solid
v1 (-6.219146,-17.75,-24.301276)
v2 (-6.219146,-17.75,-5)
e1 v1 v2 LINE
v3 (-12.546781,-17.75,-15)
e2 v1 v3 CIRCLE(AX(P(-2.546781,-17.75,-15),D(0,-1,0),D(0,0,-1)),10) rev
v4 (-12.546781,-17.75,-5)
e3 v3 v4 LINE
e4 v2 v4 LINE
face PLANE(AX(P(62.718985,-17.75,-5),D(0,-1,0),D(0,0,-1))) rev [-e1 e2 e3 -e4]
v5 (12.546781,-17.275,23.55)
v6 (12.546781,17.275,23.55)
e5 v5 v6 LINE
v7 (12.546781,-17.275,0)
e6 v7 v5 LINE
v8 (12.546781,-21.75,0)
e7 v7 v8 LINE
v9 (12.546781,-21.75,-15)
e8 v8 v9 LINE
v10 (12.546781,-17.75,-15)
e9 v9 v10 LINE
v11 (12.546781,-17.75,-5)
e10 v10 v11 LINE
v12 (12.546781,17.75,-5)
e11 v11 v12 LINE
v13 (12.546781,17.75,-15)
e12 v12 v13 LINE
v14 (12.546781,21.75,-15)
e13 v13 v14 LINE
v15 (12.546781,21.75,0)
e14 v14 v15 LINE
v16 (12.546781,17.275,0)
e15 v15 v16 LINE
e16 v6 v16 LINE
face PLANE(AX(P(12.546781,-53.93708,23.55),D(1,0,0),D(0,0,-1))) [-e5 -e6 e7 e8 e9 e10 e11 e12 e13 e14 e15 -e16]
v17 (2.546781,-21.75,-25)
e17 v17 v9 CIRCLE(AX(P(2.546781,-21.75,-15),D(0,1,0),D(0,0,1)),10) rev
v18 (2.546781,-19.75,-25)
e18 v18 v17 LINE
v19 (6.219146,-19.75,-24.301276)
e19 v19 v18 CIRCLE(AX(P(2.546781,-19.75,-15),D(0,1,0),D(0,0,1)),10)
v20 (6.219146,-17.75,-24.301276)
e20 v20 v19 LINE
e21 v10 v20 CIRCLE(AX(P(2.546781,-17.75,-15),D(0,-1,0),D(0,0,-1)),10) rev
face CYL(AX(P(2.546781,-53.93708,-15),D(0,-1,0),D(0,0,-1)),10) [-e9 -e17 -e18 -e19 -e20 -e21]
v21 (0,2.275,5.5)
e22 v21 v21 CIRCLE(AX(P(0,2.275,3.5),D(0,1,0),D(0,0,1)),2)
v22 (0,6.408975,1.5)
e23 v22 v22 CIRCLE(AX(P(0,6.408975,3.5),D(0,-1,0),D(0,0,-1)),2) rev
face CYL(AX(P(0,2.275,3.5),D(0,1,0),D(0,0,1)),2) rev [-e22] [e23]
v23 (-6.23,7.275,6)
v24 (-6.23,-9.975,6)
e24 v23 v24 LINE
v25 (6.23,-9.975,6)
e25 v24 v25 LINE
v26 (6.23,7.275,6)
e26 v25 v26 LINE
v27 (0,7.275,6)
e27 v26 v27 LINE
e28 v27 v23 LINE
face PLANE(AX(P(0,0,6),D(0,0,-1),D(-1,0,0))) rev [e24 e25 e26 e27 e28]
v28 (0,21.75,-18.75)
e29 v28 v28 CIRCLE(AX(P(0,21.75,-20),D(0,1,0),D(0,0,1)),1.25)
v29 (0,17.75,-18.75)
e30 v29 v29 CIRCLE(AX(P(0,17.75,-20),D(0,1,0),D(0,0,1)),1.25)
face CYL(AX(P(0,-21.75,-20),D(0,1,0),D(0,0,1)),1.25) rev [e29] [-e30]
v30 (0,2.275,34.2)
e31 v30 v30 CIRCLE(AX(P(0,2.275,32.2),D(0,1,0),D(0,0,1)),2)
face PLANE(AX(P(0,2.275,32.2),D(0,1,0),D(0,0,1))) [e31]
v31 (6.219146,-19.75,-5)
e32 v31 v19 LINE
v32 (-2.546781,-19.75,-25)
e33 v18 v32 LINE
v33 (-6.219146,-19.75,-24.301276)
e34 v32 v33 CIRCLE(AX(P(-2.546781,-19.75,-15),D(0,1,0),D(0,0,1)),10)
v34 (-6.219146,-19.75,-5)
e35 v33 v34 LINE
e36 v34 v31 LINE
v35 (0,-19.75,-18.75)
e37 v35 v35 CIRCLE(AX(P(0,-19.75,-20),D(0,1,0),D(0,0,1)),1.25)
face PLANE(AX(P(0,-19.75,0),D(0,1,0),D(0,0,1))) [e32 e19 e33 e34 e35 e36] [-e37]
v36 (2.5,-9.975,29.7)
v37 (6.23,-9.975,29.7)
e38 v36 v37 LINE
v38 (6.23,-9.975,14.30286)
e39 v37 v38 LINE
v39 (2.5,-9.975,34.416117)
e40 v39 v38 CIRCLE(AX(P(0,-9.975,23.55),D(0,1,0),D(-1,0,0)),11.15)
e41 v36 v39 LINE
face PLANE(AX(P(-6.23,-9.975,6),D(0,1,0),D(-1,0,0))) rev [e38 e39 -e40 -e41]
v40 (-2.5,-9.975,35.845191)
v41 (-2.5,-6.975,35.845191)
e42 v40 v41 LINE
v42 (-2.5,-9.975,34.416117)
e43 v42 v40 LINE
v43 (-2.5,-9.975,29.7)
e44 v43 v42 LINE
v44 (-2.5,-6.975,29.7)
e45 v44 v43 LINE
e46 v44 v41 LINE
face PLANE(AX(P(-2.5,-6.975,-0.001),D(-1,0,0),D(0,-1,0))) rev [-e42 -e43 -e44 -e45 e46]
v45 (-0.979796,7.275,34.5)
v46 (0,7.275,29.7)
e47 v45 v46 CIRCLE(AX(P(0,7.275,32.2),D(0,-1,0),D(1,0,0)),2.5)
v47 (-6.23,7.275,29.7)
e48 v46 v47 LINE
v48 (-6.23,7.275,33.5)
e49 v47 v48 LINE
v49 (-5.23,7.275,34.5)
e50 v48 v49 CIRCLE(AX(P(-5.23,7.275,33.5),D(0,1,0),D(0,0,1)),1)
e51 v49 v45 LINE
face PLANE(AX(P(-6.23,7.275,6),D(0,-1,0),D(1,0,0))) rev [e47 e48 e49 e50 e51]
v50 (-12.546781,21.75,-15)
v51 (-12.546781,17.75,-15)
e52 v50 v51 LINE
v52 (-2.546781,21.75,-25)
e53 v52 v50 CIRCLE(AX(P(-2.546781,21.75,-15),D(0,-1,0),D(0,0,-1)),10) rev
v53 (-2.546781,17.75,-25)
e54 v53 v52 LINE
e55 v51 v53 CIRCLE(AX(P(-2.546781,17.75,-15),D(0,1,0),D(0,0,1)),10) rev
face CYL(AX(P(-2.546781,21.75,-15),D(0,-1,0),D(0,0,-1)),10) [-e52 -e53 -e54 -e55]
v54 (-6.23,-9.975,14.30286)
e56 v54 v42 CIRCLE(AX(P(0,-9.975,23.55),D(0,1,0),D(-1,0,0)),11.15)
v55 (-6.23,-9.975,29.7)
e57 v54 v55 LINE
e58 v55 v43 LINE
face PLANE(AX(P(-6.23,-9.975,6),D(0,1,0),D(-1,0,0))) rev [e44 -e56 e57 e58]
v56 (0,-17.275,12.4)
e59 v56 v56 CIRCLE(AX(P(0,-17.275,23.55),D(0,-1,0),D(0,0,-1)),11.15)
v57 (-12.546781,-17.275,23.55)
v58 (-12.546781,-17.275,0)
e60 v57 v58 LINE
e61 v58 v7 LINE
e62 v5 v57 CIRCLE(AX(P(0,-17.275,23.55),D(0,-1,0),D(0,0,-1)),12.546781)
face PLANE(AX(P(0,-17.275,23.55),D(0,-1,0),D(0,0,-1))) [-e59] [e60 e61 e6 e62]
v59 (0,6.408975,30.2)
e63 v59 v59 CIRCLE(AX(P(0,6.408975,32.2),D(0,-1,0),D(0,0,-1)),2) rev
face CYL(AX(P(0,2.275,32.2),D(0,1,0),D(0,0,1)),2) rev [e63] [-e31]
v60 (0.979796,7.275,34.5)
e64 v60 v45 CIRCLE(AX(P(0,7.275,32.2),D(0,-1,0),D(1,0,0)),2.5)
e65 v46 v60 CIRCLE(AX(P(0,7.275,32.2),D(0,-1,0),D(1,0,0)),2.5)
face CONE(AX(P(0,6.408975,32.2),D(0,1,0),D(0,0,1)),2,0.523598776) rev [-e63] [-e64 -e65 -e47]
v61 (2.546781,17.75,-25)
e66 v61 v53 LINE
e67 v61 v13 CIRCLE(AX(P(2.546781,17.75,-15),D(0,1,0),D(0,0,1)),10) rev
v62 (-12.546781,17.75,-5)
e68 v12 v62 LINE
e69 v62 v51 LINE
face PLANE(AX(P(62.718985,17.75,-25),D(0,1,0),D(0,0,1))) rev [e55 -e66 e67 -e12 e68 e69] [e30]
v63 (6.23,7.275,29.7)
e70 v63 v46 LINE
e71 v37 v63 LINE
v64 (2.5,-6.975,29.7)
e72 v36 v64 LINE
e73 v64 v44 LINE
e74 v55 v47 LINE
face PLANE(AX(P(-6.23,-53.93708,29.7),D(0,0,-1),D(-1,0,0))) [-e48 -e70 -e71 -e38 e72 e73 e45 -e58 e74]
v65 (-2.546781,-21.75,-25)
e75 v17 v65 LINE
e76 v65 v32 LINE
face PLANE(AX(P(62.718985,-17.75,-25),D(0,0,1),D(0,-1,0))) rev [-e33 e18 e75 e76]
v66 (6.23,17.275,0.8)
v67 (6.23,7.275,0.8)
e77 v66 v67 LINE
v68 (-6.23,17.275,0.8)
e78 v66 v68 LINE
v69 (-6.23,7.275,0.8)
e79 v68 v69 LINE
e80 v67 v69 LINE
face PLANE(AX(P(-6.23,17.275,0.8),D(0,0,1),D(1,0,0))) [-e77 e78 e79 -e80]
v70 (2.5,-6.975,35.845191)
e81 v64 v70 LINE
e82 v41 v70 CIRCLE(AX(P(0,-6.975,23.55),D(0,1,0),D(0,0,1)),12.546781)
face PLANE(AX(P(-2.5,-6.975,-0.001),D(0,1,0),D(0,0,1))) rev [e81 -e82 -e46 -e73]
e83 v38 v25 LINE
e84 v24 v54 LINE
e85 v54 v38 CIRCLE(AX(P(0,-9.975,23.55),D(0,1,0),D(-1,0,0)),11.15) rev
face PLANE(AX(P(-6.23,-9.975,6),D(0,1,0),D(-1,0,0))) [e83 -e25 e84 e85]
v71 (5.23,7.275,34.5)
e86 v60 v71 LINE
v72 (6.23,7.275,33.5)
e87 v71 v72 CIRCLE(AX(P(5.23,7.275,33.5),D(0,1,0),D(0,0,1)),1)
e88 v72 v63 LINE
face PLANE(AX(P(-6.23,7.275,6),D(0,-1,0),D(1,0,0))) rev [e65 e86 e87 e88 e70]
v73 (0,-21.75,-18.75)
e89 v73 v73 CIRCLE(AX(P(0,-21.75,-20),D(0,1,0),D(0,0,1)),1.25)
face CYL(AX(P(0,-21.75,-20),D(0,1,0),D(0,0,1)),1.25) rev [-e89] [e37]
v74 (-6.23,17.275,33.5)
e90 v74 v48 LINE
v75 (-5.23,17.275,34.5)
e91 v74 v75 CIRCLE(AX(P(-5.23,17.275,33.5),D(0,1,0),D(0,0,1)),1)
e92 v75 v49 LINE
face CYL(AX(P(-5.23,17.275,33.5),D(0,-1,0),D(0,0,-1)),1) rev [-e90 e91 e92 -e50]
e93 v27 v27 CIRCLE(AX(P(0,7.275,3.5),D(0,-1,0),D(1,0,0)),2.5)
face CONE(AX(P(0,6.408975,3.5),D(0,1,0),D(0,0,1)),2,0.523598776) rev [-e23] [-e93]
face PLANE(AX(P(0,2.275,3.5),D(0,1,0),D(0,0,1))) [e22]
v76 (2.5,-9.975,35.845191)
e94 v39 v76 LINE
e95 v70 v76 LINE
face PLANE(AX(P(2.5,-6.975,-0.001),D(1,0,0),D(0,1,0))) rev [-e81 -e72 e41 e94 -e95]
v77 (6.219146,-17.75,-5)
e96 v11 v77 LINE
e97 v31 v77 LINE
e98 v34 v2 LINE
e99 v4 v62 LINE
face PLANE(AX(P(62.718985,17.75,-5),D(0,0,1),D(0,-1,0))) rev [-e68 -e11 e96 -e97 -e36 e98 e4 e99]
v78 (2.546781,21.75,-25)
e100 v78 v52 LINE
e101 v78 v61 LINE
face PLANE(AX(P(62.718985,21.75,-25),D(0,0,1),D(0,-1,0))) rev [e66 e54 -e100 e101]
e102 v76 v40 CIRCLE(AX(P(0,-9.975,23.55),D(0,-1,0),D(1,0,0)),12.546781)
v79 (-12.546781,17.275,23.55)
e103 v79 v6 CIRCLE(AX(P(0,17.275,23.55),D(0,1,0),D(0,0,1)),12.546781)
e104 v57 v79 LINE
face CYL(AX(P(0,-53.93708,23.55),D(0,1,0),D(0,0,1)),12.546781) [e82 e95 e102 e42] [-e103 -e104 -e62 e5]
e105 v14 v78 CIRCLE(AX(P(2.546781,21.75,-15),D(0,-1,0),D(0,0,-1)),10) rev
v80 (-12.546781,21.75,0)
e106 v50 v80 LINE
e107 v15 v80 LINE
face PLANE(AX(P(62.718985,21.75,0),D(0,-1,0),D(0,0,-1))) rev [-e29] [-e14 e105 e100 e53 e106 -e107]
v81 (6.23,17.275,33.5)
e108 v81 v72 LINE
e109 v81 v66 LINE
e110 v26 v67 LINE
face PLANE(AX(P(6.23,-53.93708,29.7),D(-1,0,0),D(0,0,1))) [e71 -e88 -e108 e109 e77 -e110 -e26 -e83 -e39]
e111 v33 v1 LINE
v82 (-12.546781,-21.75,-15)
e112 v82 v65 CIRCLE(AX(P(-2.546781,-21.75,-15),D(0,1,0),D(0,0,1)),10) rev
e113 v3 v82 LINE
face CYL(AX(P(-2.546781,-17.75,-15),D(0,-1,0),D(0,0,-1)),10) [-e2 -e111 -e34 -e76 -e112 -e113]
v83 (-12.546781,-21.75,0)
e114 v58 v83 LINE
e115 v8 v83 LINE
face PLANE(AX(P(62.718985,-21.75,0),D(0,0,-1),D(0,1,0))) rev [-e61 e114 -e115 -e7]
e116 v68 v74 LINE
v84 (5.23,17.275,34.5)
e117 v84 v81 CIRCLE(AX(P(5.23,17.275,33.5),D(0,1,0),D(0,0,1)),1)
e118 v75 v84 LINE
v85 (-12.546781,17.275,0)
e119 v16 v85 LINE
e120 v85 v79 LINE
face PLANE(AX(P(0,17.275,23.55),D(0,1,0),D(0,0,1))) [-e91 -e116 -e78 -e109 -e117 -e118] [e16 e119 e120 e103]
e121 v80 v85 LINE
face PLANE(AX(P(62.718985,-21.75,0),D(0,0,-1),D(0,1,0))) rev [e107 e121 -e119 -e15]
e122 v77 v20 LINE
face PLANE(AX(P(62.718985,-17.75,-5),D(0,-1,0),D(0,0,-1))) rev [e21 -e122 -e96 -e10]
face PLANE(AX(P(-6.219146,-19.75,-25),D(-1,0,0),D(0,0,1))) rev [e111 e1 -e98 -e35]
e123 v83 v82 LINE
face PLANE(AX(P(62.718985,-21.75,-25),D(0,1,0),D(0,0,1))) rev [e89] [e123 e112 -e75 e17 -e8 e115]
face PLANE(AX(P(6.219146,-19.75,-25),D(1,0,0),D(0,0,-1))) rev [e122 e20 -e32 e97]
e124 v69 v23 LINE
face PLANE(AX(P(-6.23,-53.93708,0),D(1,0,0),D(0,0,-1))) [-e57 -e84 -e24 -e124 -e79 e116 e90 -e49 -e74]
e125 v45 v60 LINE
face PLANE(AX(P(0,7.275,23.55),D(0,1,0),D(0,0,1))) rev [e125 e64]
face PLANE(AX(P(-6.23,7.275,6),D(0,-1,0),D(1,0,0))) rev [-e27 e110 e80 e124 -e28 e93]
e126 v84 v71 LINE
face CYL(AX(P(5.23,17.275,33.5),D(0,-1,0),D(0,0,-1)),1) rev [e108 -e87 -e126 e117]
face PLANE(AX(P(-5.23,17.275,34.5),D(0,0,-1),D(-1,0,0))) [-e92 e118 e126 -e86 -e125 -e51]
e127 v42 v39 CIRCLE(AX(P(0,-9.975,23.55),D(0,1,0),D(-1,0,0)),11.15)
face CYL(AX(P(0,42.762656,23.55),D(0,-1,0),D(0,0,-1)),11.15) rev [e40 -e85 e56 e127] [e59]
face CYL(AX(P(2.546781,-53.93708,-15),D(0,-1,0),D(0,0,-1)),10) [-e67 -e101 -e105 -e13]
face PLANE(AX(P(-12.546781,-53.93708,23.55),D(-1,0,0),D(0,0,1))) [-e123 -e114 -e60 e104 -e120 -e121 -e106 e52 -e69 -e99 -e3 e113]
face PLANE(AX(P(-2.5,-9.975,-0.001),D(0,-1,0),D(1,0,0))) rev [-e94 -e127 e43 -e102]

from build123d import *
from OCP.BRepFilletAPI import BRepFilletAPI_MakeChamfer

# Parameters (mm, degrees)
SKETCH4_W                = 12.46
SKETCH4_H                = 17.25
BOSS_EXTRUDE3_DEPTH      = 6
BOSS_EXTRUDE6_DEPTH      = 7.3
BOSS_EXTRUDE6_DEPTH_BACK = 17.25
SKETCH8_R                = 12.546781182
SKETCH8_R_2              = 11.15
BOSS_EXTRUDE4_DEPTH      = 17.25
SKETCH6_R                = 2
CUT_EXTRUDE1_DEPTH       = 5
CHAMFER1_SIZE            = 0.5
CHAMFER1_SIZE_2          = 0.866025404
SKETCH10_W               = 12.46
SKETCH10_H               = 23.7
CUT_EXTRUDE3_DEPTH       = 17.25
CUT_EXTRUDE4_REACH       = 43.938
SKETCH11_W               = 5
SKETCH11_H               = 3
BOSS_EXTRUDE7_START      = -7.3
BOSS_EXTRUDE7_DEPTH      = 7.3
BOSS_EXTRUDE9_START      = 10
BOSS_EXTRUDE9_DEPTH      = 10
BOSS_EXTRUDE10_DEPTH     = 25.093562364
SKETCH18_W               = 20
SKETCH18_H               = 12.438292938
CUT_EXTRUDE5_DEPTH       = 2
CUT_EXTRUDE6_DEPTH       = 57.41497434
CUT_EXTRUDE6_DEPTH_BACK  = 57.41497434
SKETCH19_R               = 1.25
FILLET1_R                = 10


with BuildPart() as part:
    # Sketch4 → Boss-Extrude3 (new body)
    with BuildSketch(Plane.XY):
        with Locations((0, -1.35)):
            Rectangle(SKETCH4_W, SKETCH4_H)
    extrude(amount=BOSS_EXTRUDE3_DEPTH)



with BuildPart() as body_2:
    # Sketch8 → Boss-Extrude6 (new, two sides: drawn at the far end of the back side and taken through both)
    with BuildSketch(Plane(origin=(0, -9.975, 0), x_dir=(-1, 0, 0), z_dir=(0, -1, 0)).offset(-BOSS_EXTRUDE6_DEPTH_BACK)):
        with Locations(Location((0, -23.55, 0), (0, 0, 90))):
            Circle(SKETCH8_R)
        with Locations(Location((0, -23.55, 0), (0, 0, 90))):
            Circle(SKETCH8_R_2, mode=Mode.SUBTRACT)
    extrude(amount=BOSS_EXTRUDE6_DEPTH + BOSS_EXTRUDE6_DEPTH_BACK)


with BuildPart() as part_1:
    add(part.part)

    add(body_2.part)  # Boss-Extrude4 merges body 2
    # Sketch5 → Boss-Extrude4 (add)
    with BuildSketch(Plane(origin=(0, 7.275, 0), x_dir=(1, 0, 0), z_dir=(0, 1, 0))):
        with BuildLine():
            Line((12.546781182, -23.55), (12.546781182, 0))
            Line((12.546781182, 0), (6.23, 0))
            Line((6.23, 0), (6.23, -29.7))
            Line((6.23, -29.7), (-6.23, -29.7))
            Line((-6.23, -29.7), (-6.23, 0))
            Line((-6.23, 0), (-12.546781182, 0))
            Line((-12.546781182, 0), (-12.546781182, -23.55))
            ThreePointArc((-12.546781182, -23.55), (0, -36.096781182), (12.546781182, -23.55))
        make_face()
    extrude(amount=-BOSS_EXTRUDE4_DEPTH)

    # Sketch6 → Cut-Extrude1 (cut)
    with BuildSketch(Plane(origin=(0, 7.275, 0), x_dir=(1, 0, 0), z_dir=(0, 1, 0))):
        with Locations(Location((0, -3.5, 0), (0, 0, 270))):
            Circle(SKETCH6_R)
        with Locations(Location((0, -32.2, 0), (0, 0, 270))):
            Circle(SKETCH6_R)
    extrude(amount=-CUT_EXTRUDE1_DEPTH, mode=Mode.SUBTRACT)

    # Chamfer1
    chamfer1_edges_1 = [part_1.edges().sort_by_distance(p)[0] for p in [
        (0, 7.275, 1.5),
    ]]
    chamfer1_side_1 = [part_1.faces().sort_by_distance(p)[0] for p in [
        (0, 7.275, 1.49),
    ]]
    chamfer1_edges_2 = [part_1.edges().sort_by_distance(p)[0] for p in [
        (0, 7.275, 30.2),
    ]]
    chamfer1_side_2 = [part_1.faces().sort_by_distance(p)[0] for p in [
        (0, 7.275, 30.19),
    ]]
    chamfer1 = BRepFilletAPI_MakeChamfer(part_1.part.solid().wrapped)
    for e in chamfer1_edges_1:
        chamfer1.Add(CHAMFER1_SIZE - 0.0001, CHAMFER1_SIZE_2 - 0.0001, e.wrapped, chamfer1_side_1[0].wrapped)
    for e in chamfer1_edges_2:
        chamfer1.Add(CHAMFER1_SIZE - 0.0001, CHAMFER1_SIZE_2 - 0.0001, e.wrapped, chamfer1_side_2[0].wrapped)
    add(Compound.cast(chamfer1.Shape()), mode=Mode.REPLACE)  # a hair under: the kernel refuses the full size

    # Sketch10 → Cut-Extrude3 (cut)
    with BuildSketch(Plane(origin=(0, 7.275, 0), x_dir=(1, 0, 0), z_dir=(0, 1, 0))):
        with Locations((0, -17.85)):
            Rectangle(SKETCH10_W, SKETCH10_H)
    extrude(amount=-CUT_EXTRUDE3_DEPTH, mode=Mode.SUBTRACT)

    # Sketch11 → Cut-Extrude4 (cut, up to next)
    with BuildSketch(Plane.XY.offset(36.096781182), mode=Mode.PRIVATE) as cut_extrude4_sk1:
        with Locations((0, -8.475)):
            Rectangle(SKETCH11_W, SKETCH11_H)
    cut_extrude4_tool1 = extrude(cut_extrude4_sk1.sketch, amount=-CUT_EXTRUDE4_REACH, mode=Mode.PRIVATE) & part_1.part
    add(cut_extrude4_tool1.solids().sort_by_distance((0, -8.475, 36.096781))[0], mode=Mode.SUBTRACT)

    # Sketch13 → Boss-Extrude7 (add)
    with BuildSketch(Plane.XZ.offset(17.275).offset(BOSS_EXTRUDE7_START)):
        with BuildLine():
            Line((-12.546781182, 23.55), (-12.546781182, 0))
            Line((-12.546781182, 0), (12.546781182, 0))
            Line((12.546781182, 0), (12.546781182, 23.55))
            ThreePointArc((12.546781182, 23.55), (0, 11.003218818), (-12.546781182, 23.55))
        make_face()
    extrude(amount=BOSS_EXTRUDE7_DEPTH)

    # Sketch15 → Boss-Extrude9 (add)
    with BuildSketch(Plane(origin=(0, 7.275, 0), x_dir=(1, 0, 0), z_dir=(0, 1, 0)).offset(BOSS_EXTRUDE9_START)):
        with BuildLine():
            Line((-12.546781182, 0), (12.546781182, 0))
            Line((12.546781182, 0), (12.546781182, -23.55))
            ThreePointArc((12.546781182, -23.55), (0, -36.096781182), (-12.546781182, -23.55))
            Line((-12.546781182, -23.55), (-12.546781182, 0))
        make_face()
        with BuildLine():
            Line((-6.23, -0.8), (6.23, -0.8))
            Line((6.23, -0.8), (6.23, -33.5))
            ThreePointArc((6.23, -33.5), (5.937106781, -34.207106781), (5.23, -34.5))
            Line((5.23, -34.5), (-5.23, -34.5))
            ThreePointArc((-5.23, -34.5), (-5.937106781, -34.207106781), (-6.23, -33.5))
            Line((-6.23, -33.5), (-6.23, -0.8))
        make_face(mode=Mode.SUBTRACT)
    extrude(amount=-BOSS_EXTRUDE9_DEPTH)

    # Sketch17 → Boss-Extrude10 (add)
    with BuildSketch(Plane(origin=(-12.546781182, 4.728218818, 0), x_dir=(0, -1, 0), z_dir=(1, 0, 0))):
        Polygon((26.478218818, 25), (26.478218818, 0), (-17.021781182, 0), (-17.021781182, 25), (-13.021781182, 25), (-13.021781182, 5), (22.478218818, 5), (22.478218818, 25), align=None)
    extrude(amount=BOSS_EXTRUDE10_DEPTH)

    # Sketch18 → Cut-Extrude5 (cut)
    with BuildSketch(Plane.ZX.offset(-17.75)):
        with Locations((-15, 0)):
            Rectangle(SKETCH18_W, SKETCH18_H)
    extrude(amount=-CUT_EXTRUDE5_DEPTH, mode=Mode.SUBTRACT)

    # Sketch19 → Cut-Extrude6 (cut, two sides: drawn at the far end of the back side and taken through both)
    with BuildSketch(Plane.ZX.offset(-19.75).offset(-CUT_EXTRUDE6_DEPTH_BACK)):
        with Locations((-20, 0)):
            Circle(SKETCH19_R)
    extrude(amount=CUT_EXTRUDE6_DEPTH + CUT_EXTRUDE6_DEPTH_BACK, mode=Mode.SUBTRACT)

    # Fillet1
    fillet1_edges = [part_1.edges().sort_by_distance(p)[0] for p in [
        (12.546781182, -19.75, -25),
        (-12.546781182, -19.75, -25),
        (12.546781182, 19.75, -25),
        (-12.546781182, 19.75, -25),
    ]]
    fillet(fillet1_edges, radius=FILLET1_R)


solid = part_1.part
